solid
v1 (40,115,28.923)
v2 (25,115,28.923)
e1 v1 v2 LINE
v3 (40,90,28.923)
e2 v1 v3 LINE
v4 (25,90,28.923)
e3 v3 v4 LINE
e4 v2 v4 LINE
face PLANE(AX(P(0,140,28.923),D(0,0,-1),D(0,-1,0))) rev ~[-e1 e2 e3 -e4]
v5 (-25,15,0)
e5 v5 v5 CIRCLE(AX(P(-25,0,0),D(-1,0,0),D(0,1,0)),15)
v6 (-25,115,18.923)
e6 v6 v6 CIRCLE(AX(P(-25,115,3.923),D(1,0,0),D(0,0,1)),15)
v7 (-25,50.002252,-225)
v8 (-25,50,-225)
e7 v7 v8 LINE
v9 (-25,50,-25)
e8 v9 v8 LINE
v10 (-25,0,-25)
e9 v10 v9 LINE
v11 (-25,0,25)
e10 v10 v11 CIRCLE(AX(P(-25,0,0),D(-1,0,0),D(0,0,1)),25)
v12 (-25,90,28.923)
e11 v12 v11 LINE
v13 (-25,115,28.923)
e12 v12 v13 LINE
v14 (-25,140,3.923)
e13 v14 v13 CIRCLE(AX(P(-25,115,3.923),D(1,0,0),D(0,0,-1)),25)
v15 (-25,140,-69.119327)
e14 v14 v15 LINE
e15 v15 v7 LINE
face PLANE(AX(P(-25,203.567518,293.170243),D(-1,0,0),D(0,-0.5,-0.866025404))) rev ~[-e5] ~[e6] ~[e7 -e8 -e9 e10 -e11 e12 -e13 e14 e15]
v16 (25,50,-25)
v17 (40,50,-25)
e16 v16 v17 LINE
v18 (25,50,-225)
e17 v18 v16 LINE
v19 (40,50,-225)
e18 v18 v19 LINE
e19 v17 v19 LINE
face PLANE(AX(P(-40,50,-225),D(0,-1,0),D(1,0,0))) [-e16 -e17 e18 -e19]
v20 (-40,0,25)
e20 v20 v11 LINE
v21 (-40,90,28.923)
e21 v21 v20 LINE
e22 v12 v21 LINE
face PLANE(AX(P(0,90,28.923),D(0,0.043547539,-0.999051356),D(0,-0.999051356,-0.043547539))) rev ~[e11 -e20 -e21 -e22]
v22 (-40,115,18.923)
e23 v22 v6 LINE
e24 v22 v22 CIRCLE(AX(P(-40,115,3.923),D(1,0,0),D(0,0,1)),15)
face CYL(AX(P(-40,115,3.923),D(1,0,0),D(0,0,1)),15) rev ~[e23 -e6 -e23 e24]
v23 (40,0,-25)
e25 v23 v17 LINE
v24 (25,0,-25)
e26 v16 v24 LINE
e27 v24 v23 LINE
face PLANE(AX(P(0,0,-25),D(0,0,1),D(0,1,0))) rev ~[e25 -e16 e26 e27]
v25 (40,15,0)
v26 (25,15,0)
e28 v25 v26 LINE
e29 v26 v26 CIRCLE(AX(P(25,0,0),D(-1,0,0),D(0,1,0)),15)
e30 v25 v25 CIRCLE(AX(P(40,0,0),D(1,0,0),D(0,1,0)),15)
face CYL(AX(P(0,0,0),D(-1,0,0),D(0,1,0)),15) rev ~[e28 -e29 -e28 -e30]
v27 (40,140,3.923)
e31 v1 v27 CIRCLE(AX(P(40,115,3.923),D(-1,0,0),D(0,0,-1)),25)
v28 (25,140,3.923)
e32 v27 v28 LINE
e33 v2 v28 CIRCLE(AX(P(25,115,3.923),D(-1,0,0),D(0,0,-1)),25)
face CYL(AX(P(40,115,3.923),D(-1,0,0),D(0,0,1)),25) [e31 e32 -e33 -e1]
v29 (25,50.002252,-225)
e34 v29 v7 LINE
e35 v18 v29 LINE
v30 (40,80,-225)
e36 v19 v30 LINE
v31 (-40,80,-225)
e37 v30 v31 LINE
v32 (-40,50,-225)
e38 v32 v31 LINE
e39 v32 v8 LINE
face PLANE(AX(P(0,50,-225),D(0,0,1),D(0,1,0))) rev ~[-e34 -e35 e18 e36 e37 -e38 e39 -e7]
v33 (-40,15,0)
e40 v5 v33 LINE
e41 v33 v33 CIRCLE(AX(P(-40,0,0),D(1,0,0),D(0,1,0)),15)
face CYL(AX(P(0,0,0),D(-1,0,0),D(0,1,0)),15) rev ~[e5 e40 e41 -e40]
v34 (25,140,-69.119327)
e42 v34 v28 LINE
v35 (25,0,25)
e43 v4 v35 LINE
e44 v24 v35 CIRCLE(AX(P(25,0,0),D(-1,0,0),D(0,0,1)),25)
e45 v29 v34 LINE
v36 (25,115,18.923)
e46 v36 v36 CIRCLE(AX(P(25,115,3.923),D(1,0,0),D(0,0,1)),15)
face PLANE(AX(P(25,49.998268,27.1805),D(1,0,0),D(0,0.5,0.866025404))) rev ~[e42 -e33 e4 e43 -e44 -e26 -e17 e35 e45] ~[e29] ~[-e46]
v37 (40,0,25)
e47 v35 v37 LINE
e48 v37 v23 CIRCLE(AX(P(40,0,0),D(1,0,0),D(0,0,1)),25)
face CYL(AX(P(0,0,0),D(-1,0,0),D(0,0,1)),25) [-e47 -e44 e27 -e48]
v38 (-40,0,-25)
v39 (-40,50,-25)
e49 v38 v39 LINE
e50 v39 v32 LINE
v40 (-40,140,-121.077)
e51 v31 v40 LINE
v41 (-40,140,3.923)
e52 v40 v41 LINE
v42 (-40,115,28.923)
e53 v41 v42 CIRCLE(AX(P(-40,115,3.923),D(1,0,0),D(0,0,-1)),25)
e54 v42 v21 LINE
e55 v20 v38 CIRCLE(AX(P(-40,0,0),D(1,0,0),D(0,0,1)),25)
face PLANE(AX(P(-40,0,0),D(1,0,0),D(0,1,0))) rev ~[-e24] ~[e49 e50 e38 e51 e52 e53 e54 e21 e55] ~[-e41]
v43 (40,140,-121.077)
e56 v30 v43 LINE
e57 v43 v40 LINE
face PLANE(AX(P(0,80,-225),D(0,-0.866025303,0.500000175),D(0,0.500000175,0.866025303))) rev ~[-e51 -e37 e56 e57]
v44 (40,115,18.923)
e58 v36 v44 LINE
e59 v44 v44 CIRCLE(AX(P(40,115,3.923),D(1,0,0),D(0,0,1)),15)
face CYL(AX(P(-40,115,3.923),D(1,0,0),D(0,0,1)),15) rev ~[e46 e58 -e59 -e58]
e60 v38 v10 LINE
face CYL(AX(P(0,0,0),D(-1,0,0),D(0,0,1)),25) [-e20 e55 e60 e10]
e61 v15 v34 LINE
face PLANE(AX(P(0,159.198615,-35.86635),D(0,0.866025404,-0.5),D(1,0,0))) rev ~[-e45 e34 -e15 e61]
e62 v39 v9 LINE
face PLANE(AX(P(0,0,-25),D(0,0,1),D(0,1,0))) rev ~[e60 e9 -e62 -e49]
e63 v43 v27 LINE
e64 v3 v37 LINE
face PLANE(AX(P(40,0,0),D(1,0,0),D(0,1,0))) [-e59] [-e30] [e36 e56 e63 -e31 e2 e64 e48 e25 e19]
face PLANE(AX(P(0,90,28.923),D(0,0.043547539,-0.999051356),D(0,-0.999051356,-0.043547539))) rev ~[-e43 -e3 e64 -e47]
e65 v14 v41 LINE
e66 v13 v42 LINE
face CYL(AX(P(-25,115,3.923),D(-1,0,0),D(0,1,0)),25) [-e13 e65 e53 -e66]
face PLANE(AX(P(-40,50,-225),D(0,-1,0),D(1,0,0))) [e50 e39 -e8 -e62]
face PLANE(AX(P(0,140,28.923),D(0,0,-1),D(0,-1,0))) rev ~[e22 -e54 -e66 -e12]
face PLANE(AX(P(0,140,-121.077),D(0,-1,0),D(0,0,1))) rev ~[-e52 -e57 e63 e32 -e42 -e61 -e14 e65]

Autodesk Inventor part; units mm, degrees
ref_plane "YZ Plane" through (0, 0, 0) normal (1, 0, 0) x (0, 1, 0)
ref_plane "XZ Plane" through (0, 0, 0) normal (0, 1, 0) x (-1, 0, 0)
sketch "草图1" plane through (0, 0, 0) normal (1, 0, 0) x (0, 1, 0)
  circle A0 centre (0, 0) radius 15
  arc A1 (0, 25) -> (0, -25) centre (0, 0) ccw
  line L0 (0, -25) -> (50, -25)
  line L1 (50, -25) -> (50, -225)
  line L2 (50, -225) -> (80, -225)
  line L3 (80, -225) -> (140, -121.077)
  line L4 (140, -121.077) -> (140, 28.923)
  line L5 (140, 28.923) -> (90, 28.923)
  line L6 (90, 28.923) -> (0, 25)
  dimension "d0" = 30
  dimension "d1" = 50
  dimension "d2" = 50
  dimension "d4" = 200
  dimension "d5" = 30
  dimension "d6" = 30
  dimension "d7" = 120
  dimension "d8" = 150
  dimension "d9" = 50
extrude "拉伸1" add sketch "草图1" along normal mid plane 80
sketch "草图2" plane through (-40, 50, -225) normal (0, -1, 0) x (1, 0, 0)
  line L0 (80, 0) -> (0, 0) projected
  line L1 (40, 0) -> (40, 253.923)
  line L2 (80, 253.923) -> (0, 253.923) projected
  line L3 (15, -693.1323) -> (65, -693.1323)
  line L4 (65, -693.1323) -> (65, 466.9493)
  line L5 (65, 466.9493) -> (15, 466.9493)
  line L6 (15, 466.9493) -> (15, -693.1323)
  line L7 (15, -693.1323) -> (65, 466.9493) construction
  line L8 (65, -693.1323) -> (15, 466.9493) construction
  point P0 (40, 225)
  point P1 (40, -113.0915)
  dimension "d12" = 50
extrude "拉伸2" cut sketch "草图2" along normal through all
ref_plane "工作平面2" through (0, 50, 27.1795) normal (0, 0.8660254, -0.5) x (1, 0, 0)
sketch "草图3" plane through (0, 50, 27.1795) normal (0, 0.8660254, -0.5) x (1, 0, 0)
  line L0 (25, -307.1385) -> (-25, -307.1385)
  line L1 (-25, -307.1385) -> (-25, 307.1385)
  line L2 (-25, 307.1385) -> (25, 307.1385)
  line L3 (25, 307.1385) -> (25, -307.1385)
  line L4 (-25, 0) -> (25, 0) projected
  line L5 (25, -307.1385) -> (-25, 307.1385) construction
  line L6 (-25, -307.1385) -> (25, 307.1385) construction
  point P0 (0, 48.5381)
  point P1 (0, 0)
  dimension "d16" = 50
extrude "拉伸3" cut sketch "草图3" along normal up to surface (126.0897 mm away)
fillet "圆角1" radius 25 2 edges at (-32.5, 140, 28.923) (32.5, 140, 28.923)
sketch "草图4" plane through (-40, 0, 0) normal (-1, 0, 0) x (0, 0, 1)
  line L0 (3.923, 140) -> (-121.077, 140) projected
  line L1 (28.923, 90) -> (28.923, 115) projected
  point P0 (0, 0)
  point P1 (3.923, 115)
  dimension "d27" = 25
  dimension "d28" = 25
hole "孔1" at (-40, 115, 3.923) direction (1, 0, 0) diameter 30 end through all
sketch "草图5" plane through (25, 0, -25) normal (-1, 0, 0) x (0, 0, 1)
  point P0 (25, 0)
properties part number "Finger" material "钢，高强度，低合金"
